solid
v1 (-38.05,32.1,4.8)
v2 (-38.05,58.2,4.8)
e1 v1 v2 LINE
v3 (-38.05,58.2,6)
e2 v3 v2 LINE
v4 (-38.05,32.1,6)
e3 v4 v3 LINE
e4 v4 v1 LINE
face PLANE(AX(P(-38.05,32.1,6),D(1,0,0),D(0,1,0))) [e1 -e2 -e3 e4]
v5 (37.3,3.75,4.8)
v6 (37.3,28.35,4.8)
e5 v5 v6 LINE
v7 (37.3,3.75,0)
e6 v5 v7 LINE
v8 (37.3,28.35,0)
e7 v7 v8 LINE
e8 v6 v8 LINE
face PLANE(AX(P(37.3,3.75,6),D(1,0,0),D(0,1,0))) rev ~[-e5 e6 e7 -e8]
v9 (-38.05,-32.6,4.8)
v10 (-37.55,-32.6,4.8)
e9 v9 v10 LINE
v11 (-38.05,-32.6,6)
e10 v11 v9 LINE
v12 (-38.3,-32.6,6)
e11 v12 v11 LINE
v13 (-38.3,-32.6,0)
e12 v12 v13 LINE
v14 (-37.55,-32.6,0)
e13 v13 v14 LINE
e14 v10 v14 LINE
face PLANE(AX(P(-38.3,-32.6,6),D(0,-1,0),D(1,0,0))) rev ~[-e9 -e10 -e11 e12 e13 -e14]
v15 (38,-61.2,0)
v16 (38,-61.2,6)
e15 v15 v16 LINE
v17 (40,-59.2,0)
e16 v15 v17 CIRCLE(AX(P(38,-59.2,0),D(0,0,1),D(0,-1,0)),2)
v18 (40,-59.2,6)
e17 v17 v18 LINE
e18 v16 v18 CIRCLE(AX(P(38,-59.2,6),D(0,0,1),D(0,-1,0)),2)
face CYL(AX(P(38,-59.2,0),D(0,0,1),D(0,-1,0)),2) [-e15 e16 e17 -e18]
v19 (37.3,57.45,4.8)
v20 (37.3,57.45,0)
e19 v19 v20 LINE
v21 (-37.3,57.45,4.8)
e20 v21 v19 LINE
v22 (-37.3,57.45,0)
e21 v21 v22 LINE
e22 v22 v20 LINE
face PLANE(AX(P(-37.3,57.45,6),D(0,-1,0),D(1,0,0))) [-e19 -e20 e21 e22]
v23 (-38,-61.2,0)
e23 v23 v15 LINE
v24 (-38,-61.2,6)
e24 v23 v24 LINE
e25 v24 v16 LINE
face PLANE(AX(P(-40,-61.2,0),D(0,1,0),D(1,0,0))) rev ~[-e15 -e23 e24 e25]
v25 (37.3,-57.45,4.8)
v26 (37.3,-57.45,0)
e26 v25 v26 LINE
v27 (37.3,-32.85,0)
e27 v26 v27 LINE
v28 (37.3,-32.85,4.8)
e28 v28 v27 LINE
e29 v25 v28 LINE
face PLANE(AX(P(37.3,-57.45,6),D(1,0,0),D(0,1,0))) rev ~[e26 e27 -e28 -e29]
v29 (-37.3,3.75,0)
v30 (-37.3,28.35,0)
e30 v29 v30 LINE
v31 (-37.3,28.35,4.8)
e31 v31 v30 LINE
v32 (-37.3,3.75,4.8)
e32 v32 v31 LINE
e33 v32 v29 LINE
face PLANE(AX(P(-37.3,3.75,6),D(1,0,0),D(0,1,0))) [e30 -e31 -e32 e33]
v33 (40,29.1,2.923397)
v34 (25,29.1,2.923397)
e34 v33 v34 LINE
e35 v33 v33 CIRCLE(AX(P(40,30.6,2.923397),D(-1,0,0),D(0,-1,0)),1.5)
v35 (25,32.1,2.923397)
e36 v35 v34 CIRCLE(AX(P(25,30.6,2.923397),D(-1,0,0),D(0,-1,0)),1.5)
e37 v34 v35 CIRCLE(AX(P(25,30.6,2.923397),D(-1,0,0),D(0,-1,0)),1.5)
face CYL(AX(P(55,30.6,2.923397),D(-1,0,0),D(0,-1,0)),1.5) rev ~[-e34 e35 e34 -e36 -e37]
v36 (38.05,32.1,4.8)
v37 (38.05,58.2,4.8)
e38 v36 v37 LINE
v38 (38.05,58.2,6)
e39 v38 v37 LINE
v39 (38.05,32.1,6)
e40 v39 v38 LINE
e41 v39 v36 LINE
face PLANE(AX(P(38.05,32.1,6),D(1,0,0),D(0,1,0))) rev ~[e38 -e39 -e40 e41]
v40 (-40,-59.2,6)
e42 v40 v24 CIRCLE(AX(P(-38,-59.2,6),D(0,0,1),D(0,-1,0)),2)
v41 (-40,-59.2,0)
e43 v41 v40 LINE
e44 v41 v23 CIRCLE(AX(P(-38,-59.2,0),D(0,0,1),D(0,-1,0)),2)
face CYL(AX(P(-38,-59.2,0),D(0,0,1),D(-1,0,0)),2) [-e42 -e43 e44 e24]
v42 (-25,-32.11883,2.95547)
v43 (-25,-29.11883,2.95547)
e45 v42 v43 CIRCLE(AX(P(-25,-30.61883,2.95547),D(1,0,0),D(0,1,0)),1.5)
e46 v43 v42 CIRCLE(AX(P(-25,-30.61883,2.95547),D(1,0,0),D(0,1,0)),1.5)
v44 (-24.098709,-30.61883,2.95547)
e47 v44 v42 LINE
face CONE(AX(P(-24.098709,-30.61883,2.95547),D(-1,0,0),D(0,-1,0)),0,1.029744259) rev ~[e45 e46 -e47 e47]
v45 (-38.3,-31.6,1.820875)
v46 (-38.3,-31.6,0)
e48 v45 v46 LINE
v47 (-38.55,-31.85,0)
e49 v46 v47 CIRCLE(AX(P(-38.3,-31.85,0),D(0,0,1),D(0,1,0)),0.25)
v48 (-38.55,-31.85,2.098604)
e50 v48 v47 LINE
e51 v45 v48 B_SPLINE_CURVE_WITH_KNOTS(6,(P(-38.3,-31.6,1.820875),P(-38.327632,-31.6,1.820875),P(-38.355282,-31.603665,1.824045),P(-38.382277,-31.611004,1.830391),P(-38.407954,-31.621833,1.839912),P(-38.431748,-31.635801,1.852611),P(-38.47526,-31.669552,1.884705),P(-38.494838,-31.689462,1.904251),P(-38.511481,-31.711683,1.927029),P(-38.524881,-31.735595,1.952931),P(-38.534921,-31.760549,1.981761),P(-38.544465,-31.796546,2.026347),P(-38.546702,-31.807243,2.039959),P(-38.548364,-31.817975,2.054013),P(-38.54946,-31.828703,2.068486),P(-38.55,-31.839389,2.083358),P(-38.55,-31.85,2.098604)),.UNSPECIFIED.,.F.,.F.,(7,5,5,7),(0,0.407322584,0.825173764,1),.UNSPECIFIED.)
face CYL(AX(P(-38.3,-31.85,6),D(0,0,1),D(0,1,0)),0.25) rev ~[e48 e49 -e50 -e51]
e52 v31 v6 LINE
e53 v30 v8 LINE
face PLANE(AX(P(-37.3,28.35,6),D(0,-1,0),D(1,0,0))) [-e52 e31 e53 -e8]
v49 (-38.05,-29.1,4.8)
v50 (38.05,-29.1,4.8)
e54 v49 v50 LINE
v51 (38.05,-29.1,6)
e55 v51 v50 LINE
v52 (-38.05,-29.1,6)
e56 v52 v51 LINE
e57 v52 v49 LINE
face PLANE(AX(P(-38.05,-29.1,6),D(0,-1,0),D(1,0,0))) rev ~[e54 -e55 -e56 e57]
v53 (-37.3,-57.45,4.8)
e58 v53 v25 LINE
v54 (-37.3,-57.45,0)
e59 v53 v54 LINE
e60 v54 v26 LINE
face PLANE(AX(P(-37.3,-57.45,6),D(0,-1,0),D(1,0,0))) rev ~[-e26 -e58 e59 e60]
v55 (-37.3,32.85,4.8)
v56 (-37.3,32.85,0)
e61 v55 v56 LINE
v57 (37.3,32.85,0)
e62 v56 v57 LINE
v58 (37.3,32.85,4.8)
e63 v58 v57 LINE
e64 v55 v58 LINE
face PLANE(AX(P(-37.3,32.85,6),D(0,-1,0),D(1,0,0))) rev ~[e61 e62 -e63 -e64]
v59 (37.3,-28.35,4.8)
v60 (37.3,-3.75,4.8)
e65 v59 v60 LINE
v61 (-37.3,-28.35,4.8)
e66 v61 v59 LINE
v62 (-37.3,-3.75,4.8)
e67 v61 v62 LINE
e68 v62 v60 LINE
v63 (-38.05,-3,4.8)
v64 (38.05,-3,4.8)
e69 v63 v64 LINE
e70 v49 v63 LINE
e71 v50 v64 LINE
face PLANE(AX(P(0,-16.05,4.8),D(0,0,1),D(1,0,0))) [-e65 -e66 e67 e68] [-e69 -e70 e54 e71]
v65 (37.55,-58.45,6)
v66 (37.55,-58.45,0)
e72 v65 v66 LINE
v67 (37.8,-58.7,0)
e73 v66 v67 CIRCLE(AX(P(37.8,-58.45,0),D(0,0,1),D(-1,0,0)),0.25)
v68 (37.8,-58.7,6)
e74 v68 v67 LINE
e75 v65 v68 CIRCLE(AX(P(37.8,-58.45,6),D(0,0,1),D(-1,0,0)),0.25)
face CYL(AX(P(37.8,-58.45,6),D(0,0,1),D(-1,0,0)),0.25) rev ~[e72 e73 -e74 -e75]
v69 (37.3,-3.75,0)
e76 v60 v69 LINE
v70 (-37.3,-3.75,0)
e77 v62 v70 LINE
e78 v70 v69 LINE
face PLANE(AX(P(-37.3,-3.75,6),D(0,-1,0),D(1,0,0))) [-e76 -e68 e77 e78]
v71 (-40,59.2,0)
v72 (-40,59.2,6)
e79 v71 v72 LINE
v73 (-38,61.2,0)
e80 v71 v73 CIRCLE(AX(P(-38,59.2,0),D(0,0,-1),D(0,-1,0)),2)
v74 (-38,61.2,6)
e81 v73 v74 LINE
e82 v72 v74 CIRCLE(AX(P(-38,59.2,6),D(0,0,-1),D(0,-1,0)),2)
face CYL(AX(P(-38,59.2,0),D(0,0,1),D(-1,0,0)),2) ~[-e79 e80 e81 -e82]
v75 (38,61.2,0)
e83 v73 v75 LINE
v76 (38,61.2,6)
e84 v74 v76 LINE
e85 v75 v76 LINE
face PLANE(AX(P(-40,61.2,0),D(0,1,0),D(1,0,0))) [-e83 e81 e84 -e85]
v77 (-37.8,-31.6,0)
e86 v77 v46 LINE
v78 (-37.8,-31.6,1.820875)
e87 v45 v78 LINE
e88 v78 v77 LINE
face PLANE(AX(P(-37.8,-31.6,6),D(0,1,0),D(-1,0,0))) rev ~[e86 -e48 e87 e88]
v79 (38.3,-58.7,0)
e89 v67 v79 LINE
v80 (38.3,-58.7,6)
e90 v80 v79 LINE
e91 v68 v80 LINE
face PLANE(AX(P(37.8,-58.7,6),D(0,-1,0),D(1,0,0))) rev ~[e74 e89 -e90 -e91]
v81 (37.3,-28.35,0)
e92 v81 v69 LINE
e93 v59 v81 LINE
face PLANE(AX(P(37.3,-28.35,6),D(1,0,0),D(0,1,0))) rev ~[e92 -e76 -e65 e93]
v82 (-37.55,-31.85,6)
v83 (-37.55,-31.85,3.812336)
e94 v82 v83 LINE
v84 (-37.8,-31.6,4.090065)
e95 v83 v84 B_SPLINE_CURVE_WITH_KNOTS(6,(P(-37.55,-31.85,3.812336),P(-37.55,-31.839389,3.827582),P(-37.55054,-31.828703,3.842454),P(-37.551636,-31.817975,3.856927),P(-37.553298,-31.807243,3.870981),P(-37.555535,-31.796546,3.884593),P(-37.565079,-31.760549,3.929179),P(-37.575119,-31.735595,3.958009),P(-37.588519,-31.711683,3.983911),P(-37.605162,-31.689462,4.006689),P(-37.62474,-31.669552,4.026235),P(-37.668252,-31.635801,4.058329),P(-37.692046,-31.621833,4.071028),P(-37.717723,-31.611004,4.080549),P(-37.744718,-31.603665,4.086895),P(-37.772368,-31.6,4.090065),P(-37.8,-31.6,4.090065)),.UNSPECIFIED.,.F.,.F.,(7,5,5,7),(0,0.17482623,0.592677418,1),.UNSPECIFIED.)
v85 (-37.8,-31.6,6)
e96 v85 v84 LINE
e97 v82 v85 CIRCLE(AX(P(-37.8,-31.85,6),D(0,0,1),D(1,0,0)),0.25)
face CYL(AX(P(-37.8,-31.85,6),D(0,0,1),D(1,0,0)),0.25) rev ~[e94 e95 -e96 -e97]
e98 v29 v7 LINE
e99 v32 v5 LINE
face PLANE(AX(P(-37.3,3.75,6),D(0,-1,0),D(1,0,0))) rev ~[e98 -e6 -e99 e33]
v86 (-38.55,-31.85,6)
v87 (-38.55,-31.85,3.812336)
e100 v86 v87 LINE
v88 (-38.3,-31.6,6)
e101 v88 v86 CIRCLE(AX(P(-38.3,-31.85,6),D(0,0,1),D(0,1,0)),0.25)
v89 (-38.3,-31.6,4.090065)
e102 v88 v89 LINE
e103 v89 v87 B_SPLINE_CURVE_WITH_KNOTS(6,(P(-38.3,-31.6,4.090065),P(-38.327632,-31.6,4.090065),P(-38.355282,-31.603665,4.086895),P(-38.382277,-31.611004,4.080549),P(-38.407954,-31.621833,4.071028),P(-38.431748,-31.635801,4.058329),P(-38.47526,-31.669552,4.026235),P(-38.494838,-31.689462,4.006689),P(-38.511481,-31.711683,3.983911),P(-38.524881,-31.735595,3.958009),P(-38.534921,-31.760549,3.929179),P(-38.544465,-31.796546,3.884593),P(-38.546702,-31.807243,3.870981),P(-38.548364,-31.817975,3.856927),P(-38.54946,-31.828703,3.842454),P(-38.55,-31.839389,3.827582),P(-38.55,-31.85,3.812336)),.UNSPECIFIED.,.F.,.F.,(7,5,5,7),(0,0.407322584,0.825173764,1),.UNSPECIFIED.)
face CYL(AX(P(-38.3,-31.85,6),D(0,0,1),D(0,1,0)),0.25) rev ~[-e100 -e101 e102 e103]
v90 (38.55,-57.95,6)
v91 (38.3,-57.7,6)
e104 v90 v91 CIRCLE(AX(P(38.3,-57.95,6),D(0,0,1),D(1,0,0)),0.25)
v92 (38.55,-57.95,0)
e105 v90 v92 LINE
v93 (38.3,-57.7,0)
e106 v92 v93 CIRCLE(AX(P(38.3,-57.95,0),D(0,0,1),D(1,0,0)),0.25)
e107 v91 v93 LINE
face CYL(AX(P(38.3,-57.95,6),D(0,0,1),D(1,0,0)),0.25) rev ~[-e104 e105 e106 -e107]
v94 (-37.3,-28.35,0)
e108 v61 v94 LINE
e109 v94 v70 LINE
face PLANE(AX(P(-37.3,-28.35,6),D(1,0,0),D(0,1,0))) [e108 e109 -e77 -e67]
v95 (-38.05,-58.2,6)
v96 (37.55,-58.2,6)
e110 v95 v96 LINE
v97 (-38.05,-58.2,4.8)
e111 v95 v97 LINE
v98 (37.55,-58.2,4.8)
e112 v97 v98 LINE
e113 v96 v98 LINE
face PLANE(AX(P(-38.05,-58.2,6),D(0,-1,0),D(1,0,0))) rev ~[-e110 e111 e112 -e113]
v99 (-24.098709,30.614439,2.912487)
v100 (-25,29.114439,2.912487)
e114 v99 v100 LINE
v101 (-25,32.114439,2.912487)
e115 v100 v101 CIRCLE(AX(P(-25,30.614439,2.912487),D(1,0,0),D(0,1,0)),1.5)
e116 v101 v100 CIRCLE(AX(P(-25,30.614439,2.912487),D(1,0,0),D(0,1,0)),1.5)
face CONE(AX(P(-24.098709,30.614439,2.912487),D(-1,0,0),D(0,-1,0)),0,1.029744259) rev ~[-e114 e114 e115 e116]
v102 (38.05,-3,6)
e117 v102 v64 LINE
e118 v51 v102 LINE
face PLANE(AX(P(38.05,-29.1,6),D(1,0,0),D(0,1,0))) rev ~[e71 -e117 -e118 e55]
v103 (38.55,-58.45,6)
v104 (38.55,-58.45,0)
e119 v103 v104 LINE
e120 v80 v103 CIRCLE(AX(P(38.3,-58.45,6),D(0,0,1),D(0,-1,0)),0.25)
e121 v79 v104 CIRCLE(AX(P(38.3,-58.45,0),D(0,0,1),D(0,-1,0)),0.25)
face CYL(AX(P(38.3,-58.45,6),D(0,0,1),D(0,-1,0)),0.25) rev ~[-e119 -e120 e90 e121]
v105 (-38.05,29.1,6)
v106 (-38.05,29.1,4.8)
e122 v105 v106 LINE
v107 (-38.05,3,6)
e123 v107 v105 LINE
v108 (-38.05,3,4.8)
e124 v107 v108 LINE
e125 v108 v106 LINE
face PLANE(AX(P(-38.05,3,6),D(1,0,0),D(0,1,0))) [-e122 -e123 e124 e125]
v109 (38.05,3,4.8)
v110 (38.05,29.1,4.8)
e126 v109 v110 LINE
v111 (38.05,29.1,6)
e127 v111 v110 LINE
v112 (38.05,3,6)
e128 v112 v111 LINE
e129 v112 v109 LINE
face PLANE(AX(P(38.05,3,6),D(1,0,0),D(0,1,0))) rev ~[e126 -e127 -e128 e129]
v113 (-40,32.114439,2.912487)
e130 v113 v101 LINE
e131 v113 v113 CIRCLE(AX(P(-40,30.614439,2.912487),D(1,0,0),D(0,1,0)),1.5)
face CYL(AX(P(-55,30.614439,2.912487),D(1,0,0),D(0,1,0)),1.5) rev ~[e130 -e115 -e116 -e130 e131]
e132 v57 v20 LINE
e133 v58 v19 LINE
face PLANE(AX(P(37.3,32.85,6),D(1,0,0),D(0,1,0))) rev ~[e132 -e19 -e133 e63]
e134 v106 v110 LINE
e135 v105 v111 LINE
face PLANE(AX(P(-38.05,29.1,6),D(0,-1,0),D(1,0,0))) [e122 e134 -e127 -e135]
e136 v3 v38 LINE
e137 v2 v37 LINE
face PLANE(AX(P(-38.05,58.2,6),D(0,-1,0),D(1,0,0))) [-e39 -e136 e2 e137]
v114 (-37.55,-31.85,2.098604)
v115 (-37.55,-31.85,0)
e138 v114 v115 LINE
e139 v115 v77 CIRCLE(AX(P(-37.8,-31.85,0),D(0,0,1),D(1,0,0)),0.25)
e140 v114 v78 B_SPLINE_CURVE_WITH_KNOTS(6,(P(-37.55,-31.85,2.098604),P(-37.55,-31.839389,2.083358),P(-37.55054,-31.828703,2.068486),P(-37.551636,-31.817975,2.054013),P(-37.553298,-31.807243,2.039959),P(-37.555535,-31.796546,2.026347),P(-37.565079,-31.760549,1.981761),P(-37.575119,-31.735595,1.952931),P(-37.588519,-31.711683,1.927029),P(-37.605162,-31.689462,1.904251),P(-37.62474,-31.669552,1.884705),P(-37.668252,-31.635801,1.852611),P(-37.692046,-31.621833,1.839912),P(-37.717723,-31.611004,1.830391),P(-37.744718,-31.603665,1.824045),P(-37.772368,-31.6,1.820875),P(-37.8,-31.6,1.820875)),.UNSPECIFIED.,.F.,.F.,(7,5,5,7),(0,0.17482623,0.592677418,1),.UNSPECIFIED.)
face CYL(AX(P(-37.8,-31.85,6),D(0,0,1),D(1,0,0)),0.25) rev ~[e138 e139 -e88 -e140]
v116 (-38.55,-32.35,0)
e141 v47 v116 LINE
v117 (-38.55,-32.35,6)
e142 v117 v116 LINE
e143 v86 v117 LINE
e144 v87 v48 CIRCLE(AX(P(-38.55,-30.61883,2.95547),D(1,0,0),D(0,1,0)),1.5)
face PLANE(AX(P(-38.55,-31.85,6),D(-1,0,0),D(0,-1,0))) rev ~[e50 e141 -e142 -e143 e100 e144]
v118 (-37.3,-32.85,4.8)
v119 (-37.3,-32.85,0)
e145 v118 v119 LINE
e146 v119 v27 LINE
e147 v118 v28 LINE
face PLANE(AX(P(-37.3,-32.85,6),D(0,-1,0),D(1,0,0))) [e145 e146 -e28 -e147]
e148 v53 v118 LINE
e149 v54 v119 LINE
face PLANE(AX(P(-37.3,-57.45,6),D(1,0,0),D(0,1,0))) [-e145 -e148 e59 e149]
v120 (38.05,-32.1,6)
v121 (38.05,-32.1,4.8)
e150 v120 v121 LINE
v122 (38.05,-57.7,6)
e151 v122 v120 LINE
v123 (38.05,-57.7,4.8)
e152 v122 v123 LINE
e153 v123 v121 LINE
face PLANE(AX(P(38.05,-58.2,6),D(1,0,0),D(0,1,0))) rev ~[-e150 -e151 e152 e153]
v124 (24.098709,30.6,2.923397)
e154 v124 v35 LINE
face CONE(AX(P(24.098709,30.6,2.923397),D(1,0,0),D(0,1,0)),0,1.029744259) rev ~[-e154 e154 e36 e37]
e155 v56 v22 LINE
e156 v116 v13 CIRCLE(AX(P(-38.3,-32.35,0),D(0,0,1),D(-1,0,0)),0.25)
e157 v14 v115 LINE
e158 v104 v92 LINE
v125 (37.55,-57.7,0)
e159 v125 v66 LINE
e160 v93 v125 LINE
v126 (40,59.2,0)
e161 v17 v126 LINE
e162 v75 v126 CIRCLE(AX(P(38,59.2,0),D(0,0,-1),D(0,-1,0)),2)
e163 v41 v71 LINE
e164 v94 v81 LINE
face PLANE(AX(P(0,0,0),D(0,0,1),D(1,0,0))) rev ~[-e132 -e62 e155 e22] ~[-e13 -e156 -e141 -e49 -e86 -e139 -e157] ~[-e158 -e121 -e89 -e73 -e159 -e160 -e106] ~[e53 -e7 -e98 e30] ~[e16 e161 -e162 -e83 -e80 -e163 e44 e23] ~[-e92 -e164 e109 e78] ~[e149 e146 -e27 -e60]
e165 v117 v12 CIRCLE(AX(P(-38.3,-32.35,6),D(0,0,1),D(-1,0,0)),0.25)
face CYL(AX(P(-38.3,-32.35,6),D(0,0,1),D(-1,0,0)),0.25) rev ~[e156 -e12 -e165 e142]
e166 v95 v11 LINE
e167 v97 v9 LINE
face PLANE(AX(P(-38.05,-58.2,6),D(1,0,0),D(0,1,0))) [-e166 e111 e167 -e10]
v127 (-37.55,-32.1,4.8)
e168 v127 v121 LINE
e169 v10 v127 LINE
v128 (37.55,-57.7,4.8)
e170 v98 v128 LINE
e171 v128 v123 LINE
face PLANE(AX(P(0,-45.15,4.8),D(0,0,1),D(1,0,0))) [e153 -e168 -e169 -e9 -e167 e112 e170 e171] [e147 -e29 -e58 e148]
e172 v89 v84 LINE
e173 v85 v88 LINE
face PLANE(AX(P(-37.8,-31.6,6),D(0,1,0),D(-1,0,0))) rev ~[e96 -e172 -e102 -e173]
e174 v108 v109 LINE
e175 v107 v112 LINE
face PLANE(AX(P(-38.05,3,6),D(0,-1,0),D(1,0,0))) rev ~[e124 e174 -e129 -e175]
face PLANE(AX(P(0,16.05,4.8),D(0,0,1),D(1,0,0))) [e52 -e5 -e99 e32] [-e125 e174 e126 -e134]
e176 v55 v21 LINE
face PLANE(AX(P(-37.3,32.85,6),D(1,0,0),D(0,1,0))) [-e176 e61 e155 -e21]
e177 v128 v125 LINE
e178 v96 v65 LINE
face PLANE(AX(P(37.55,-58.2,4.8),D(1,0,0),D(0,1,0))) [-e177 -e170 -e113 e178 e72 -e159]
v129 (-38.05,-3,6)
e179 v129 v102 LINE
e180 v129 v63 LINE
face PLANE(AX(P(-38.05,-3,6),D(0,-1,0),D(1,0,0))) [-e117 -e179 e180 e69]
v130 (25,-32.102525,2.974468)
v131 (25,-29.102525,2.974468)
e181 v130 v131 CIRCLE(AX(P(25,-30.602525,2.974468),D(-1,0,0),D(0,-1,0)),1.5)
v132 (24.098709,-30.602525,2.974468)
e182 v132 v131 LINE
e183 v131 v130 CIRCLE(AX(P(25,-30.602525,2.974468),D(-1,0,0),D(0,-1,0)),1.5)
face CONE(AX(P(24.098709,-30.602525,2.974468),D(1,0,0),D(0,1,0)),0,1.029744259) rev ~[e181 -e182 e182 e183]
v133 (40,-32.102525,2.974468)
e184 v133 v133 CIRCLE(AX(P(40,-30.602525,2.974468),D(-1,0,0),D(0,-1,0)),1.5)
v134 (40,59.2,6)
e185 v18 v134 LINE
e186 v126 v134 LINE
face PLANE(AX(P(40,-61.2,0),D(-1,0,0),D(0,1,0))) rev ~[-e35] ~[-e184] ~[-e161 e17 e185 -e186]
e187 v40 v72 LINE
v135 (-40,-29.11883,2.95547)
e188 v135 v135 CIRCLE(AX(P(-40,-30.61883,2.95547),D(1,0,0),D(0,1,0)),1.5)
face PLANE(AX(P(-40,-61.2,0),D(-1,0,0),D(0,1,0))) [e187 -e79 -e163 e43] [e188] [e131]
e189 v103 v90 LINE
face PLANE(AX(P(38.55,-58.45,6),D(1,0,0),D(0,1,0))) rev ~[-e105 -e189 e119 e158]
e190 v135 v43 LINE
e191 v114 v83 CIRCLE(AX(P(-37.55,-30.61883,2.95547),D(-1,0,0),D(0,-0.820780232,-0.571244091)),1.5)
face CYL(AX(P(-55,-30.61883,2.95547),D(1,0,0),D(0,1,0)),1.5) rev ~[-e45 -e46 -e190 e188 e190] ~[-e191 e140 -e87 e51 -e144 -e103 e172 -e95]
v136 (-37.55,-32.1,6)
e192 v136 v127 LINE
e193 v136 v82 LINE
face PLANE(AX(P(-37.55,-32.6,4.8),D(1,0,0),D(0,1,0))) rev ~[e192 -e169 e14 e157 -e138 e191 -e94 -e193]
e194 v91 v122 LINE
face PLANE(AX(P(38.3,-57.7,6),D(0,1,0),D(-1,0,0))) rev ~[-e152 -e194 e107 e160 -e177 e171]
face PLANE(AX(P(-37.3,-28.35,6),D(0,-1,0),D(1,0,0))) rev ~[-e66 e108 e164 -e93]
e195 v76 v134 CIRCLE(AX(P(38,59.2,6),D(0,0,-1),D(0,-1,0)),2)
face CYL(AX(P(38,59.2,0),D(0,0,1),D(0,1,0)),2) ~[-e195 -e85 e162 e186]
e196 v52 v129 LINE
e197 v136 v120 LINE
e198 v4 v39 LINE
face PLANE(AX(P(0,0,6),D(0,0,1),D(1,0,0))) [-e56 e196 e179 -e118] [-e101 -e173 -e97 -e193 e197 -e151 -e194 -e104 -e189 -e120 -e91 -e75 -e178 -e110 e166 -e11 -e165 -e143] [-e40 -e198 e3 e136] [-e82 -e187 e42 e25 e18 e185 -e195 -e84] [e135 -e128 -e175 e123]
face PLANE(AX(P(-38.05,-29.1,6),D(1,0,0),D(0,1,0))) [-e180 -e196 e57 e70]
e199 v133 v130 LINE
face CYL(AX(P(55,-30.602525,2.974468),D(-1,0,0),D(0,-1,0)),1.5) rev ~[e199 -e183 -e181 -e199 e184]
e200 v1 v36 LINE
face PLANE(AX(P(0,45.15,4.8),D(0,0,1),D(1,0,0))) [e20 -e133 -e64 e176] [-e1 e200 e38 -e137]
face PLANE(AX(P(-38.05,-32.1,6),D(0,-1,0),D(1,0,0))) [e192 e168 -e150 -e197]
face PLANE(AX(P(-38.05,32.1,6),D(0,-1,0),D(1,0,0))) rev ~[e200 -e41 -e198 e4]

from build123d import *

# Parameters (mm, degrees)
F0_W      = 80
F0_H      = 122.4
F1_DEPTH  = 6
F2_W      = 76.1
F2_H      = 26.1
F2_W_2    = 74.6
F2_H_2    = 24.6
F3_DEPTH  = 1.2
F4_DEPTH  = 6.001
F6_D      = 3
F6_DEPTH  = 15
F6_TIP    = 0.9012909285
F8_D      = 3
F8_DEPTH  = 15
F8_TIP    = 0.9012909285
F9_R      = 2
F11_DEPTH = 6.001
F12_W     = 0.5
F12_H     = 0.5
F13_DEPTH = 4.8010001
F15_DEPTH = 6.0010001
F16_W     = 0.5
F16_H     = 0.5
F17_DEPTH = 4.8010001


# Not quite as in the source:
# - the program builds the solid bodies; features that only make, move or delete a surface that nothing else refers to are left out


with BuildPart() as f1:
    # F0 (on Top) → F1 (new body)
    with BuildSketch(Plane.XY):
        Rectangle(F0_W, F0_H)
    extrude(amount=F1_DEPTH)

    # F2 (on face) → F3 (cut)
    with BuildSketch(Plane.XY.offset(6)):
        with Locations((0, -45.15)):
            Rectangle(F2_W, F2_H)
        with Locations((0, -45.15)):
            Rectangle(F2_W_2, F2_H_2, mode=Mode.SUBTRACT)
        with Locations((0, -16.05)):
            Rectangle(F2_W, F2_H)
        with Locations((0, -16.05)):
            Rectangle(F2_W_2, F2_H_2, mode=Mode.SUBTRACT)
        with Locations((0, 16.05)):
            Rectangle(F2_W, F2_H)
        with Locations((0, 16.05)):
            Rectangle(F2_W_2, F2_H_2, mode=Mode.SUBTRACT)
        with Locations((0, 45.15)):
            Rectangle(F2_W, F2_H)
        with Locations((0, 45.15)):
            Rectangle(F2_W_2, F2_H_2, mode=Mode.SUBTRACT)
    extrude(amount=-F3_DEPTH, mode=Mode.SUBTRACT)

    # F4 (cut, through all): faces of the model
    f4_faces = [f1.faces().sort_by_distance(p)[0] for p in [
        (0, -45.15, 6),
        (0, -16.05, 6),
        (0, 16.05, 6),
        (0, 45.15, 6),
    ]]
    extrude(f4_faces, amount=-F4_DEPTH, mode=Mode.SUBTRACT)

    # F6
    with Locations(Plane.YZ.offset(40)):
        with Locations((-30.6025246664, 2.9744678242), (30.6, 2.9233971525)):
            Hole(F6_D / 2, depth=F6_DEPTH)
            with Locations((0, 0, -(F6_DEPTH + F6_TIP / 2))):  # 118° drill point
                Cone(0, F6_D / 2, F6_TIP, mode=Mode.SUBTRACT)

    # F8
    with Locations(Plane(origin=(-40, 0, 0), x_dir=(0, -1, 0), z_dir=(-1, 0, 0))):
        with Locations((30.6188296527, 2.9554700013), (-30.6144393981, 2.9124866705)):
            Hole(F8_D / 2, depth=F8_DEPTH)
            with Locations((0, 0, -(F8_DEPTH + F8_TIP / 2))):  # 118° drill point
                Cone(0, F8_D / 2, F8_TIP, mode=Mode.SUBTRACT)

    # F9
    f9_edges = [f1.edges().sort_by_distance(p)[0] for p in [
        (-40, -61.2, 3),
        (40, -61.2, 3),
        (40, 61.2, 3),
        (-40, 61.2, 3),
    ]]
    fillet(f9_edges, radius=F9_R)

    # F10 (on face) → F11 (cut, through all)
    with BuildSketch(Plane.XY.offset(6)):
        with BuildLine():
            Line((-38.3, -32.6), (-38.05, -32.6))
            Line((-38.05, -32.6), (-38.05, -32.1))
            Line((-38.05, -32.1), (-37.55, -32.1))
            Line((-37.55, -32.1), (-37.55, -31.85))
            ThreePointArc((-37.55, -31.85), (-37.6232233047, -31.6732233047), (-37.8, -31.6))
            Line((-37.8, -31.6), (-38.3, -31.6))
            ThreePointArc((-38.3, -31.6), (-38.4767766953, -31.6732233047), (-38.55, -31.85))
            Line((-38.55, -31.85), (-38.55, -32.35))
            ThreePointArc((-38.55, -32.35), (-38.4767766953, -32.5267766953), (-38.3, -32.6))
        make_face()
    extrude(amount=-F11_DEPTH, mode=Mode.SUBTRACT)

    # F12 (on face) → F13 (cut, through all)
    with BuildSketch(Plane.XY.offset(4.8)):
        with Locations((-37.8, -32.35)):
            Rectangle(F12_W, F12_H)
    extrude(amount=-F13_DEPTH, mode=Mode.SUBTRACT)

    # F14 (on face) → F15 (cut, through all)
    with BuildSketch(Plane.XY.offset(6)):
        with BuildLine():
            Line((37.8, -58.7), (38.3, -58.7))
            ThreePointArc((38.3, -58.7), (38.4767766953, -58.6267766953), (38.55, -58.45))
            Line((38.55, -58.45), (38.55, -57.95))
            ThreePointArc((38.55, -57.95), (38.4767766953, -57.7732233047), (38.3, -57.7))
            Line((38.3, -57.7), (38.05, -57.7))
            Line((38.05, -57.7), (38.05, -58.2))
            Line((38.05, -58.2), (37.55, -58.2))
            Line((37.55, -58.2), (37.55, -58.45))
            ThreePointArc((37.55, -58.45), (37.6232233047, -58.6267766953), (37.8, -58.7))
        make_face()
    extrude(amount=-F15_DEPTH, mode=Mode.SUBTRACT)

    # F16 (on face) → F17 (cut, through all)
    with BuildSketch(Plane.XY.offset(4.8)):
        with Locations((37.8, -57.95)):
            Rectangle(F16_W, F16_H)
    extrude(amount=-F17_DEPTH, mode=Mode.SUBTRACT)


solid = f1.part
